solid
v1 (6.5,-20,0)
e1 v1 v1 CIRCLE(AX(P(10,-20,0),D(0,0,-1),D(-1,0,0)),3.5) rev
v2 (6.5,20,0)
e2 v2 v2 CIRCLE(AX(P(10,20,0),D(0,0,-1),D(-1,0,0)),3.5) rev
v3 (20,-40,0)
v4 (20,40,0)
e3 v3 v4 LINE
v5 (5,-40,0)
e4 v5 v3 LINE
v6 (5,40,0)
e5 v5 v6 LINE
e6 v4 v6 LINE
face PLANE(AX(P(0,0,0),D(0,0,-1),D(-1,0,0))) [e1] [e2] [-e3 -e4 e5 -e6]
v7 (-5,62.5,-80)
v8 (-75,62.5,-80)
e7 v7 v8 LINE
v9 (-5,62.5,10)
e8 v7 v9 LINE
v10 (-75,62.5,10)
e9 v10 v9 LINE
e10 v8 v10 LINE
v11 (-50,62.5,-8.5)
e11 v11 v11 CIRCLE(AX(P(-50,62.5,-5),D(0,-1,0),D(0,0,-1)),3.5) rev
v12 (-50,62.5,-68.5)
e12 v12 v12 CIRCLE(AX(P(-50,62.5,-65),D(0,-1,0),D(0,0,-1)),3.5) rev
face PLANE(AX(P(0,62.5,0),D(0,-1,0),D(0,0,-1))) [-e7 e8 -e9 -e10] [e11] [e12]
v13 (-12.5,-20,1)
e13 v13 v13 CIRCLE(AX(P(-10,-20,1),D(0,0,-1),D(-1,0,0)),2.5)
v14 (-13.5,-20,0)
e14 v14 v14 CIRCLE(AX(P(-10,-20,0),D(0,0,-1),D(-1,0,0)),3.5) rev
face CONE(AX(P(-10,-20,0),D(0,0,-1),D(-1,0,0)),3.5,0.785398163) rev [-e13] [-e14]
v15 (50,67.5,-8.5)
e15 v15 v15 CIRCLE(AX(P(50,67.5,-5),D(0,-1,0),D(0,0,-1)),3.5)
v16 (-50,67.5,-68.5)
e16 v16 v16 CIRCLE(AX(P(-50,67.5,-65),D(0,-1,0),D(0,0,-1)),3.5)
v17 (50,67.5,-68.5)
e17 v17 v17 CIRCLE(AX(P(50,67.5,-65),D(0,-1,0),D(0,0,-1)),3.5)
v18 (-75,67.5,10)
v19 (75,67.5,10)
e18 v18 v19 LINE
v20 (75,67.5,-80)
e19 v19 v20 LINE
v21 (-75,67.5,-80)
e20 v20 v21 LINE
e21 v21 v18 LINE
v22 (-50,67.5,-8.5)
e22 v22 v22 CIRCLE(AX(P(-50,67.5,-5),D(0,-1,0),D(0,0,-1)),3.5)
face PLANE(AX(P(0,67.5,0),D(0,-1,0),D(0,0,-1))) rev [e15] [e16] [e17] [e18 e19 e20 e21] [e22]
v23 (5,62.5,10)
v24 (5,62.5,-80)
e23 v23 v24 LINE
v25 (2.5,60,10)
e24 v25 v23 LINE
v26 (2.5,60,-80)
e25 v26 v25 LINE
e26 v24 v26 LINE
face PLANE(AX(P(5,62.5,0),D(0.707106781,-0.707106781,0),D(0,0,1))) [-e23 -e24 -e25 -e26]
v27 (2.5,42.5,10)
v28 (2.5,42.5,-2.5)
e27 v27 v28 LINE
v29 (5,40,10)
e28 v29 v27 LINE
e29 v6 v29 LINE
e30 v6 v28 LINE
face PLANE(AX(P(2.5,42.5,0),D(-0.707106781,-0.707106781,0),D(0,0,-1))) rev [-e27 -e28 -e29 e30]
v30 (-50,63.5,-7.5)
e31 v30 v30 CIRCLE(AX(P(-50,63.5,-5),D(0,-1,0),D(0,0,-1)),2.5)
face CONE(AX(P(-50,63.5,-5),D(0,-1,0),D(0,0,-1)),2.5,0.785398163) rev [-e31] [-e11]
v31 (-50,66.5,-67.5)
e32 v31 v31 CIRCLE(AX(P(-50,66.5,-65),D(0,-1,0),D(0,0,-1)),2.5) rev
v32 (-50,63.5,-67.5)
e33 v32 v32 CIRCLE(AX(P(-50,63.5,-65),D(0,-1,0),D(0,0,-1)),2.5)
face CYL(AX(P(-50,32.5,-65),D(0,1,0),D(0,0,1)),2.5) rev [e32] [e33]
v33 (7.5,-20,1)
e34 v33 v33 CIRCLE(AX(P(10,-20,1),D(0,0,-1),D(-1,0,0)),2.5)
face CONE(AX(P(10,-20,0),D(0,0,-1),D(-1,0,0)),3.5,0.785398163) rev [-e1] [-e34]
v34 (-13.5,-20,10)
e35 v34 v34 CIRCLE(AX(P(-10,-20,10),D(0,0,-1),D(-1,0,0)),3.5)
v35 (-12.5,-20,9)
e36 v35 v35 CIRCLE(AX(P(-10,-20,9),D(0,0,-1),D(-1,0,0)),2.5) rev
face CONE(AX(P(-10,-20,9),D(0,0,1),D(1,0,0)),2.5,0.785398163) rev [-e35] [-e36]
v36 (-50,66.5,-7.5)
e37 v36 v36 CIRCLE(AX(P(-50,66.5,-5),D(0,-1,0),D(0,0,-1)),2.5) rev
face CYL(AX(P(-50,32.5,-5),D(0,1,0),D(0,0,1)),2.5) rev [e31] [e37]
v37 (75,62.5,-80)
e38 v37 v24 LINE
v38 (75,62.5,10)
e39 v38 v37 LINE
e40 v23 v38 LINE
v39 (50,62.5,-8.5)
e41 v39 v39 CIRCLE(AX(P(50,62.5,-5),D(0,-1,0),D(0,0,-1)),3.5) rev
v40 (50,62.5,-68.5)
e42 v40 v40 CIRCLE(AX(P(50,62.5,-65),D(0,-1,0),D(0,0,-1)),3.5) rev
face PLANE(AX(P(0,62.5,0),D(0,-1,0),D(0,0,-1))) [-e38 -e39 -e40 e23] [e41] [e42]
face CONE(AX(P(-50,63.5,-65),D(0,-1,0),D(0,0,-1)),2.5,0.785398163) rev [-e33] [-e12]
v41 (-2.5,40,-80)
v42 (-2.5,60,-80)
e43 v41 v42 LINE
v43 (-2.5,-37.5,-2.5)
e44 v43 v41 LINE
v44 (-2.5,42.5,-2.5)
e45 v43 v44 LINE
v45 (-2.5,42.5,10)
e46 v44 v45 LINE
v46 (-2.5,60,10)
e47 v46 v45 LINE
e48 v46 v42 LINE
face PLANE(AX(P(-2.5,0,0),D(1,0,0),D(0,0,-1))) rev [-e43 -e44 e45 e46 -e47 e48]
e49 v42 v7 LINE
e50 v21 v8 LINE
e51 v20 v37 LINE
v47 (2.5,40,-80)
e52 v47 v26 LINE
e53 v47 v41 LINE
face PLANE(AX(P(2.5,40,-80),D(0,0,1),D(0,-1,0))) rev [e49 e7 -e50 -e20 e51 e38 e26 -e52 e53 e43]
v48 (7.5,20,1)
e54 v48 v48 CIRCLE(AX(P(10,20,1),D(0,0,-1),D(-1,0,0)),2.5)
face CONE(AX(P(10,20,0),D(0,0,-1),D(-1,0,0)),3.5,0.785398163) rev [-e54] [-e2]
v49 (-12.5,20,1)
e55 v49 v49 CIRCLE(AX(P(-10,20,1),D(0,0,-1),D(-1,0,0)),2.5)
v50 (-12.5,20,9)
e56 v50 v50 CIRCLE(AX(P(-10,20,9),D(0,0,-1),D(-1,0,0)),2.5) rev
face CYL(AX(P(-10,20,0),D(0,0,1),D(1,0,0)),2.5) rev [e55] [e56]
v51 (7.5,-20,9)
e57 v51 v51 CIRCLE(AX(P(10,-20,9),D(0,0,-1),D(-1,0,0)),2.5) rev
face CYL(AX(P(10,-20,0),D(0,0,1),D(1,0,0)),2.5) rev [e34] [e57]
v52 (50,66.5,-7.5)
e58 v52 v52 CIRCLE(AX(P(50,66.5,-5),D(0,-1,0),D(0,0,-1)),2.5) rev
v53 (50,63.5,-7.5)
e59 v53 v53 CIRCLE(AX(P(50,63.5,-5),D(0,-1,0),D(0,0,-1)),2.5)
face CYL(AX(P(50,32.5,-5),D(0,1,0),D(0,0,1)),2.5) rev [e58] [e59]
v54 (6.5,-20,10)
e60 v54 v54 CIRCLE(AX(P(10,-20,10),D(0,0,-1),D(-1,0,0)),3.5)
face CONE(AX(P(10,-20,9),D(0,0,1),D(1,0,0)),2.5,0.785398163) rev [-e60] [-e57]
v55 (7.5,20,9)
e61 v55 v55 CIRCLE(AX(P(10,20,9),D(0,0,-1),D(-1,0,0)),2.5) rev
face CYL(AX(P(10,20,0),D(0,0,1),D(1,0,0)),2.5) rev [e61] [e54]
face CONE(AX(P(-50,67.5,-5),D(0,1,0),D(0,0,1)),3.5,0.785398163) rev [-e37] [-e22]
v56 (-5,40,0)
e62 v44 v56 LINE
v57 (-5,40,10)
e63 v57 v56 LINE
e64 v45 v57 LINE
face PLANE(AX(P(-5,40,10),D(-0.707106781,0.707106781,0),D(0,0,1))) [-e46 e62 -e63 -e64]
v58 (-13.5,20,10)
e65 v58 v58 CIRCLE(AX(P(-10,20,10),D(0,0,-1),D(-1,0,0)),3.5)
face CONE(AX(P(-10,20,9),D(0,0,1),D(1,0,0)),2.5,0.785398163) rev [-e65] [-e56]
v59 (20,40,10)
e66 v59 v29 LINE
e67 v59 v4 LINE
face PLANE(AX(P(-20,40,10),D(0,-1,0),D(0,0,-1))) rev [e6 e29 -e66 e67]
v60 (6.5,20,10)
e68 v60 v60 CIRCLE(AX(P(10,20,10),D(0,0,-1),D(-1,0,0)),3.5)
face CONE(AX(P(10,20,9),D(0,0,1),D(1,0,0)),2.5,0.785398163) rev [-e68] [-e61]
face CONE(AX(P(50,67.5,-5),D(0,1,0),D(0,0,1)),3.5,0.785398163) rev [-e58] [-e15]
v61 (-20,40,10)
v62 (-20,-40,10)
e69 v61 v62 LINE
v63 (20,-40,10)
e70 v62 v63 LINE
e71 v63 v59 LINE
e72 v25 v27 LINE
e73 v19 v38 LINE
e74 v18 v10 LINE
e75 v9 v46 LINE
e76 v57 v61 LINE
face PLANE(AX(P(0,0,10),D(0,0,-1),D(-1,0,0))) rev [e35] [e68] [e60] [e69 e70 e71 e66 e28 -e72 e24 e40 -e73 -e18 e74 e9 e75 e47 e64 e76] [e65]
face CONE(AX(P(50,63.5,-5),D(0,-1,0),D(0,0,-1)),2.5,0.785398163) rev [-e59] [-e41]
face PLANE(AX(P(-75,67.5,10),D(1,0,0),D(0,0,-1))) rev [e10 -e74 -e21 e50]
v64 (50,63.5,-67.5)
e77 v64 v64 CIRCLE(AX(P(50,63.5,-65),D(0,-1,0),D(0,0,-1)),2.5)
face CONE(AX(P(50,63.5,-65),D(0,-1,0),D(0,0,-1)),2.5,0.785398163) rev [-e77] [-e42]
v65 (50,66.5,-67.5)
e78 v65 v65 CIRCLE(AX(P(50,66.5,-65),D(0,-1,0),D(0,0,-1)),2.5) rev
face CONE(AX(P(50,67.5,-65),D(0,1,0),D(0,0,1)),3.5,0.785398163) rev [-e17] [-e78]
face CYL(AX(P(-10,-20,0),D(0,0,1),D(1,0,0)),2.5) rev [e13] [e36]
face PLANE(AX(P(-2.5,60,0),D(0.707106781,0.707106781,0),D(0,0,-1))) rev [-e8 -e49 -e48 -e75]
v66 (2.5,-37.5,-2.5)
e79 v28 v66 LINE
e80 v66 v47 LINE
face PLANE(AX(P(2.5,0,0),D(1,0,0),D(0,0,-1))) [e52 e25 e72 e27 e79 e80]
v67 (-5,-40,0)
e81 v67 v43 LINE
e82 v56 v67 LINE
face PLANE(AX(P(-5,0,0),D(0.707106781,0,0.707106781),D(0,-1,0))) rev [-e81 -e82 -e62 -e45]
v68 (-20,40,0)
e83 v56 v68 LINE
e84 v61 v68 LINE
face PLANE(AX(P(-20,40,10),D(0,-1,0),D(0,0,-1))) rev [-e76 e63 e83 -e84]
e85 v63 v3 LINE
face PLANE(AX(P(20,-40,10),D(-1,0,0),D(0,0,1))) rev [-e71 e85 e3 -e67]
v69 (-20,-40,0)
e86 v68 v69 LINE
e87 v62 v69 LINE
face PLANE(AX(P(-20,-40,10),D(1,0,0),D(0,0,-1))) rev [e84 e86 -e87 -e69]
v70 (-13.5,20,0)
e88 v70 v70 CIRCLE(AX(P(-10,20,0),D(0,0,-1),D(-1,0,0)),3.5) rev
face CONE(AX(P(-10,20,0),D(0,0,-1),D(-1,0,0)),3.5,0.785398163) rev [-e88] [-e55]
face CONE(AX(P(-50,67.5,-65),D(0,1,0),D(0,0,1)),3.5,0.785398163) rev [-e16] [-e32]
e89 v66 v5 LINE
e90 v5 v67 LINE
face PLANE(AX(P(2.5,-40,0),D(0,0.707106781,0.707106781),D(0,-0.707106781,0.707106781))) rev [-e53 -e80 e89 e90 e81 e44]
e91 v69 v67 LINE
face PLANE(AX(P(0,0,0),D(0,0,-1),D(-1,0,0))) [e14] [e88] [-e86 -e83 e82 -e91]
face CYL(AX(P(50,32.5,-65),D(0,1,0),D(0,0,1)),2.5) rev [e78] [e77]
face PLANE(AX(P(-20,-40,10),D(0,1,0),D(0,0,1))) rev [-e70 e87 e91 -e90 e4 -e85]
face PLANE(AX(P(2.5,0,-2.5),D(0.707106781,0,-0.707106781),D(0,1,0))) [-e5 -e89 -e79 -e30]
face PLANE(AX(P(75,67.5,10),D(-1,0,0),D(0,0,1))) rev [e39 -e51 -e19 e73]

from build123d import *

# Parameters (mm, degrees)
SKETCH1_W           = 40
SKETCH1_H           = 80
BOSS_EXTRUDE1_DEPTH = 10
SKETCH2_R           = 2.5
CUT_EXTRUDE1_DEPTH  = 10
BOSS_EXTRUDE2_DEPTH = 2.5
SKETCH4_W           = 150
SKETCH4_H           = 90
BOSS_EXTRUDE3_DEPTH = 2.5
CHAMFER1_SIZE       = 2.5
SKETCH5_R           = 2.5
CUT_EXTRUDE2_DEPTH  = 35
CHAMFER2_SIZE       = 1


with BuildPart() as part:
    # Sketch1 → Boss-Extrude1 (new body)
    with BuildSketch(Plane.XY):
        Rectangle(SKETCH1_W, SKETCH1_H)
    extrude(amount=BOSS_EXTRUDE1_DEPTH)

    # Sketch2 → Cut-Extrude1 (cut)
    with BuildSketch(Plane.XY.offset(10)):
        with Locations((-10, -20)):
            Circle(SKETCH2_R)
        with Locations(Location((10, -20, 0), (0, 0, 180))):
            Circle(SKETCH2_R)
        with Locations((10, 20)):
            Circle(SKETCH2_R)
        with Locations(Location((-10, 20, 0), (0, 0, 180))):
            Circle(SKETCH2_R)
    extrude(amount=-CUT_EXTRUDE1_DEPTH, mode=Mode.SUBTRACT)

    # Sketch3 → Boss-Extrude2 (add, symmetric)
    with BuildSketch(Plane(origin=(0, 0, 0), x_dir=(0, 0, -1), z_dir=(1, 0, 0))):
        Polygon((0, -40), (80, 40), (80, 65), (-10, 65), (-10, 40), (0, 40), align=None)
    extrude(amount=BOSS_EXTRUDE2_DEPTH, both=True)

    # Sketch4 → Boss-Extrude3 (add, symmetric)
    with BuildSketch(Plane(origin=(0, 65, 0), x_dir=(1, 0, 0), z_dir=(0, 1, 0))):
        with Locations((0, 35)):
            Rectangle(SKETCH4_W, SKETCH4_H)
    extrude(amount=BOSS_EXTRUDE3_DEPTH, both=True)

    # Chamfer1
    # the kernel refuses this chamfer: 2.5 mm, written as the material it adds along each edge
    with BuildSketch(Plane(origin=(-2.5, 40, 0), x_dir=(-0.9996219169112968, 0, 0.027495876610586372), z_dir=(0, -1, 0))) as chamfer1_piece_1_section:
        Polygon((CHAMFER1_SIZE * 0.999621916911, CHAMFER1_SIZE * 0.0274958766106), (-CHAMFER1_SIZE * 0.0274958766106, CHAMFER1_SIZE * 0.999621916911), (0, 0), align=None)
    chamfer1_piece_1 = extrude(amount=80, mode=Mode.PRIVATE)
    chamfer1_piece_1 = split(chamfer1_piece_1, bisect_by=Plane(origin=(-3.327144793, -19.384975846, -20.615024154), z_dir=(0, 0.7071067811865487, 0.7071067811865464)), keep=Keep.TOP, mode=Mode.PRIVATE)
    add(chamfer1_piece_1)
    with BuildSketch(Plane(origin=(-2.5, 40, 10), x_dir=(-0.9996219169112968, -0.0274958766105877, 0), z_dir=(0, 0, -1))) as chamfer1_piece_2:
        Polygon((CHAMFER1_SIZE * 0.999621916911, CHAMFER1_SIZE * 0.0274958766106), (-CHAMFER1_SIZE * 0.0274958766106, CHAMFER1_SIZE * 0.999621916911), (0, 0), align=None)
    extrude(amount=10)
    with BuildSketch(Plane(origin=(2.5, 40, 0), x_dir=(0.9996219169112968, 0, 0.027495876610586372), z_dir=(0, -1, 0))) as chamfer1_piece_3_section:
        Polygon((CHAMFER1_SIZE * 0.999621916911, -CHAMFER1_SIZE * 0.0274958766106), (-CHAMFER1_SIZE * 0.0274958766106, -CHAMFER1_SIZE * 0.999621916911), (0, 0), align=None)
    chamfer1_piece_3 = extrude(amount=80, mode=Mode.PRIVATE)
    chamfer1_piece_3 = split(chamfer1_piece_3, bisect_by=Plane(origin=(3.327144793, -19.384975846, -20.615024154), z_dir=(0, 0.7071067811865487, 0.7071067811865464)), keep=Keep.TOP, mode=Mode.PRIVATE)
    add(chamfer1_piece_3)
    with BuildSketch(Plane(origin=(2.5, 40, 10), x_dir=(0.9996219169112968, -0.0274958766105877, 0), z_dir=(0, 0, -1))) as chamfer1_piece_4:
        Polygon((CHAMFER1_SIZE * 0.999621916911, -CHAMFER1_SIZE * 0.0274958766106), (-CHAMFER1_SIZE * 0.0274958766106, -CHAMFER1_SIZE * 0.999621916911), (0, 0), align=None)
    extrude(amount=10)
    with BuildSketch(Plane(origin=(-2.5, 62.5, -80), x_dir=(0.027495876610586282, -0.9996219169112968, 0), z_dir=(0, 0, 1))) as chamfer1_piece_5:
        Polygon((CHAMFER1_SIZE * 0.999621916911, -CHAMFER1_SIZE * 0.0274958766106), (-CHAMFER1_SIZE * 0.0274958766106, -CHAMFER1_SIZE * 0.999621916911), (0, 0), align=None)
    extrude(amount=90)
    with BuildSketch(Plane(origin=(2.5, 62.5, -80), x_dir=(-0.027495876610586282, -0.9996219169112968, 0), z_dir=(0, 0, 1))) as chamfer1_piece_6:
        Polygon((CHAMFER1_SIZE * 0.999621916911, CHAMFER1_SIZE * 0.0274958766106), (-CHAMFER1_SIZE * 0.0274958766106, CHAMFER1_SIZE * 0.999621916911), (0, 0), align=None)
    extrude(amount=90)
    with BuildSketch(Plane(origin=(-2.5, 46.42920747, 0), x_dir=(-0.9996219169112968, 0, 0.027495876610586372), z_dir=(0, -1, 0))) as chamfer1_piece_7a_section:
        Polygon((CHAMFER1_SIZE * 0.999621916911, CHAMFER1_SIZE * 0.0274958766106), (-CHAMFER1_SIZE * 0.0274958766106, CHAMFER1_SIZE * 0.999621916911), (0, 0), align=None)
    chamfer1_piece_7a = extrude(amount=86.42920747, mode=Mode.PRIVATE)
    chamfer1_piece_7a = split(chamfer1_piece_7a, bisect_by=Plane(origin=(-3.324484067, 40, -0.824484067), z_dir=(0, 1, 0)), keep=Keep.TOP, mode=Mode.PRIVATE)
    with BuildSketch(Plane(origin=(-2.5, 40, 10), x_dir=(-0.9996219169112968, -0.0274958766105877, 0), z_dir=(0, 0, -1))) as chamfer1_piece_7b_section:
        Polygon((CHAMFER1_SIZE * 0.999621916911, CHAMFER1_SIZE * 0.0274958766106), (-CHAMFER1_SIZE * 0.0274958766106, CHAMFER1_SIZE * 0.999621916911), (0, 0), align=None)
    chamfer1_piece_7b = extrude(amount=16.42920747, mode=Mode.PRIVATE)
    chamfer1_piece_7b = split(chamfer1_piece_7b, bisect_by=Plane(origin=(-3.324484067, 40.824484067, 0), z_dir=(0, 0, -1)), keep=Keep.TOP, mode=Mode.PRIVATE)
    chamfer1_piece_7 = chamfer1_piece_7a & chamfer1_piece_7b
    add(chamfer1_piece_7)
    with BuildSketch(Plane(origin=(2.5, 46.42920747, 0), x_dir=(0.9996219169112968, 0, 0.027495876610586372), z_dir=(0, -1, 0))) as chamfer1_piece_8a_section:
        Polygon((CHAMFER1_SIZE * 0.999621916911, -CHAMFER1_SIZE * 0.0274958766106), (-CHAMFER1_SIZE * 0.0274958766106, -CHAMFER1_SIZE * 0.999621916911), (0, 0), align=None)
    chamfer1_piece_8a = extrude(amount=86.42920747, mode=Mode.PRIVATE)
    chamfer1_piece_8a = split(chamfer1_piece_8a, bisect_by=Plane(origin=(3.324484067, 40, -0.824484067), z_dir=(0, 1, 0)), keep=Keep.TOP, mode=Mode.PRIVATE)
    with BuildSketch(Plane(origin=(2.5, 40, 10), x_dir=(0.9996219169112968, -0.0274958766105877, 0), z_dir=(0, 0, -1))) as chamfer1_piece_8b_section:
        Polygon((CHAMFER1_SIZE * 0.999621916911, -CHAMFER1_SIZE * 0.0274958766106), (-CHAMFER1_SIZE * 0.0274958766106, -CHAMFER1_SIZE * 0.999621916911), (0, 0), align=None)
    chamfer1_piece_8b = extrude(amount=16.42920747, mode=Mode.PRIVATE)
    chamfer1_piece_8b = split(chamfer1_piece_8b, bisect_by=Plane(origin=(3.324484067, 40.824484067, 0), z_dir=(0, 0, -1)), keep=Keep.TOP, mode=Mode.PRIVATE)
    chamfer1_piece_8 = chamfer1_piece_8a & chamfer1_piece_8b
    add(chamfer1_piece_8)

    # Sketch5 → Cut-Extrude2 (cut, symmetric)
    with BuildSketch(Plane(origin=(0, 67.5, 0), x_dir=(1, 0, 0), z_dir=(0, 1, 0))):
        with Locations(Location((50, 65, 0), (0, 0, 90))):
            Circle(SKETCH5_R)
        with Locations(Location((50, 5, 0), (0, 0, 90))):
            Circle(SKETCH5_R)
        with Locations(Location((-50, 5, 0), (0, 0, 90))):
            Circle(SKETCH5_R)
        with Locations(Location((-50, 65, 0), (0, 0, 90))):
            Circle(SKETCH5_R)
    extrude(amount=CUT_EXTRUDE2_DEPTH, both=True, mode=Mode.SUBTRACT)

    # Chamfer2
    chamfer2_edges = [part.edges().sort_by_distance(p)[0] for p in [
        (-50, 62.5, -62.5),
        (-50, 67.5, -62.5),
        (-50, 62.5, -2.5),
        (-50, 67.5, -2.5),
        (50, 67.5, -2.5),
        (50, 62.5, -2.5),
        (50, 67.5, -62.5),
        (50, 62.5, -62.5),
        (-7.5, 20, 0),
        (-7.5, 20, 10),
        (7.5, 20, 0),
        (7.5, 20, 10),
        (12.5, -20, 0),
        (12.5, -20, 10),
        (-12.5, -20, 0),
        (-12.5, -20, 10),
    ]]
    chamfer(chamfer2_edges, length=CHAMFER2_SIZE)


solid = part.part
